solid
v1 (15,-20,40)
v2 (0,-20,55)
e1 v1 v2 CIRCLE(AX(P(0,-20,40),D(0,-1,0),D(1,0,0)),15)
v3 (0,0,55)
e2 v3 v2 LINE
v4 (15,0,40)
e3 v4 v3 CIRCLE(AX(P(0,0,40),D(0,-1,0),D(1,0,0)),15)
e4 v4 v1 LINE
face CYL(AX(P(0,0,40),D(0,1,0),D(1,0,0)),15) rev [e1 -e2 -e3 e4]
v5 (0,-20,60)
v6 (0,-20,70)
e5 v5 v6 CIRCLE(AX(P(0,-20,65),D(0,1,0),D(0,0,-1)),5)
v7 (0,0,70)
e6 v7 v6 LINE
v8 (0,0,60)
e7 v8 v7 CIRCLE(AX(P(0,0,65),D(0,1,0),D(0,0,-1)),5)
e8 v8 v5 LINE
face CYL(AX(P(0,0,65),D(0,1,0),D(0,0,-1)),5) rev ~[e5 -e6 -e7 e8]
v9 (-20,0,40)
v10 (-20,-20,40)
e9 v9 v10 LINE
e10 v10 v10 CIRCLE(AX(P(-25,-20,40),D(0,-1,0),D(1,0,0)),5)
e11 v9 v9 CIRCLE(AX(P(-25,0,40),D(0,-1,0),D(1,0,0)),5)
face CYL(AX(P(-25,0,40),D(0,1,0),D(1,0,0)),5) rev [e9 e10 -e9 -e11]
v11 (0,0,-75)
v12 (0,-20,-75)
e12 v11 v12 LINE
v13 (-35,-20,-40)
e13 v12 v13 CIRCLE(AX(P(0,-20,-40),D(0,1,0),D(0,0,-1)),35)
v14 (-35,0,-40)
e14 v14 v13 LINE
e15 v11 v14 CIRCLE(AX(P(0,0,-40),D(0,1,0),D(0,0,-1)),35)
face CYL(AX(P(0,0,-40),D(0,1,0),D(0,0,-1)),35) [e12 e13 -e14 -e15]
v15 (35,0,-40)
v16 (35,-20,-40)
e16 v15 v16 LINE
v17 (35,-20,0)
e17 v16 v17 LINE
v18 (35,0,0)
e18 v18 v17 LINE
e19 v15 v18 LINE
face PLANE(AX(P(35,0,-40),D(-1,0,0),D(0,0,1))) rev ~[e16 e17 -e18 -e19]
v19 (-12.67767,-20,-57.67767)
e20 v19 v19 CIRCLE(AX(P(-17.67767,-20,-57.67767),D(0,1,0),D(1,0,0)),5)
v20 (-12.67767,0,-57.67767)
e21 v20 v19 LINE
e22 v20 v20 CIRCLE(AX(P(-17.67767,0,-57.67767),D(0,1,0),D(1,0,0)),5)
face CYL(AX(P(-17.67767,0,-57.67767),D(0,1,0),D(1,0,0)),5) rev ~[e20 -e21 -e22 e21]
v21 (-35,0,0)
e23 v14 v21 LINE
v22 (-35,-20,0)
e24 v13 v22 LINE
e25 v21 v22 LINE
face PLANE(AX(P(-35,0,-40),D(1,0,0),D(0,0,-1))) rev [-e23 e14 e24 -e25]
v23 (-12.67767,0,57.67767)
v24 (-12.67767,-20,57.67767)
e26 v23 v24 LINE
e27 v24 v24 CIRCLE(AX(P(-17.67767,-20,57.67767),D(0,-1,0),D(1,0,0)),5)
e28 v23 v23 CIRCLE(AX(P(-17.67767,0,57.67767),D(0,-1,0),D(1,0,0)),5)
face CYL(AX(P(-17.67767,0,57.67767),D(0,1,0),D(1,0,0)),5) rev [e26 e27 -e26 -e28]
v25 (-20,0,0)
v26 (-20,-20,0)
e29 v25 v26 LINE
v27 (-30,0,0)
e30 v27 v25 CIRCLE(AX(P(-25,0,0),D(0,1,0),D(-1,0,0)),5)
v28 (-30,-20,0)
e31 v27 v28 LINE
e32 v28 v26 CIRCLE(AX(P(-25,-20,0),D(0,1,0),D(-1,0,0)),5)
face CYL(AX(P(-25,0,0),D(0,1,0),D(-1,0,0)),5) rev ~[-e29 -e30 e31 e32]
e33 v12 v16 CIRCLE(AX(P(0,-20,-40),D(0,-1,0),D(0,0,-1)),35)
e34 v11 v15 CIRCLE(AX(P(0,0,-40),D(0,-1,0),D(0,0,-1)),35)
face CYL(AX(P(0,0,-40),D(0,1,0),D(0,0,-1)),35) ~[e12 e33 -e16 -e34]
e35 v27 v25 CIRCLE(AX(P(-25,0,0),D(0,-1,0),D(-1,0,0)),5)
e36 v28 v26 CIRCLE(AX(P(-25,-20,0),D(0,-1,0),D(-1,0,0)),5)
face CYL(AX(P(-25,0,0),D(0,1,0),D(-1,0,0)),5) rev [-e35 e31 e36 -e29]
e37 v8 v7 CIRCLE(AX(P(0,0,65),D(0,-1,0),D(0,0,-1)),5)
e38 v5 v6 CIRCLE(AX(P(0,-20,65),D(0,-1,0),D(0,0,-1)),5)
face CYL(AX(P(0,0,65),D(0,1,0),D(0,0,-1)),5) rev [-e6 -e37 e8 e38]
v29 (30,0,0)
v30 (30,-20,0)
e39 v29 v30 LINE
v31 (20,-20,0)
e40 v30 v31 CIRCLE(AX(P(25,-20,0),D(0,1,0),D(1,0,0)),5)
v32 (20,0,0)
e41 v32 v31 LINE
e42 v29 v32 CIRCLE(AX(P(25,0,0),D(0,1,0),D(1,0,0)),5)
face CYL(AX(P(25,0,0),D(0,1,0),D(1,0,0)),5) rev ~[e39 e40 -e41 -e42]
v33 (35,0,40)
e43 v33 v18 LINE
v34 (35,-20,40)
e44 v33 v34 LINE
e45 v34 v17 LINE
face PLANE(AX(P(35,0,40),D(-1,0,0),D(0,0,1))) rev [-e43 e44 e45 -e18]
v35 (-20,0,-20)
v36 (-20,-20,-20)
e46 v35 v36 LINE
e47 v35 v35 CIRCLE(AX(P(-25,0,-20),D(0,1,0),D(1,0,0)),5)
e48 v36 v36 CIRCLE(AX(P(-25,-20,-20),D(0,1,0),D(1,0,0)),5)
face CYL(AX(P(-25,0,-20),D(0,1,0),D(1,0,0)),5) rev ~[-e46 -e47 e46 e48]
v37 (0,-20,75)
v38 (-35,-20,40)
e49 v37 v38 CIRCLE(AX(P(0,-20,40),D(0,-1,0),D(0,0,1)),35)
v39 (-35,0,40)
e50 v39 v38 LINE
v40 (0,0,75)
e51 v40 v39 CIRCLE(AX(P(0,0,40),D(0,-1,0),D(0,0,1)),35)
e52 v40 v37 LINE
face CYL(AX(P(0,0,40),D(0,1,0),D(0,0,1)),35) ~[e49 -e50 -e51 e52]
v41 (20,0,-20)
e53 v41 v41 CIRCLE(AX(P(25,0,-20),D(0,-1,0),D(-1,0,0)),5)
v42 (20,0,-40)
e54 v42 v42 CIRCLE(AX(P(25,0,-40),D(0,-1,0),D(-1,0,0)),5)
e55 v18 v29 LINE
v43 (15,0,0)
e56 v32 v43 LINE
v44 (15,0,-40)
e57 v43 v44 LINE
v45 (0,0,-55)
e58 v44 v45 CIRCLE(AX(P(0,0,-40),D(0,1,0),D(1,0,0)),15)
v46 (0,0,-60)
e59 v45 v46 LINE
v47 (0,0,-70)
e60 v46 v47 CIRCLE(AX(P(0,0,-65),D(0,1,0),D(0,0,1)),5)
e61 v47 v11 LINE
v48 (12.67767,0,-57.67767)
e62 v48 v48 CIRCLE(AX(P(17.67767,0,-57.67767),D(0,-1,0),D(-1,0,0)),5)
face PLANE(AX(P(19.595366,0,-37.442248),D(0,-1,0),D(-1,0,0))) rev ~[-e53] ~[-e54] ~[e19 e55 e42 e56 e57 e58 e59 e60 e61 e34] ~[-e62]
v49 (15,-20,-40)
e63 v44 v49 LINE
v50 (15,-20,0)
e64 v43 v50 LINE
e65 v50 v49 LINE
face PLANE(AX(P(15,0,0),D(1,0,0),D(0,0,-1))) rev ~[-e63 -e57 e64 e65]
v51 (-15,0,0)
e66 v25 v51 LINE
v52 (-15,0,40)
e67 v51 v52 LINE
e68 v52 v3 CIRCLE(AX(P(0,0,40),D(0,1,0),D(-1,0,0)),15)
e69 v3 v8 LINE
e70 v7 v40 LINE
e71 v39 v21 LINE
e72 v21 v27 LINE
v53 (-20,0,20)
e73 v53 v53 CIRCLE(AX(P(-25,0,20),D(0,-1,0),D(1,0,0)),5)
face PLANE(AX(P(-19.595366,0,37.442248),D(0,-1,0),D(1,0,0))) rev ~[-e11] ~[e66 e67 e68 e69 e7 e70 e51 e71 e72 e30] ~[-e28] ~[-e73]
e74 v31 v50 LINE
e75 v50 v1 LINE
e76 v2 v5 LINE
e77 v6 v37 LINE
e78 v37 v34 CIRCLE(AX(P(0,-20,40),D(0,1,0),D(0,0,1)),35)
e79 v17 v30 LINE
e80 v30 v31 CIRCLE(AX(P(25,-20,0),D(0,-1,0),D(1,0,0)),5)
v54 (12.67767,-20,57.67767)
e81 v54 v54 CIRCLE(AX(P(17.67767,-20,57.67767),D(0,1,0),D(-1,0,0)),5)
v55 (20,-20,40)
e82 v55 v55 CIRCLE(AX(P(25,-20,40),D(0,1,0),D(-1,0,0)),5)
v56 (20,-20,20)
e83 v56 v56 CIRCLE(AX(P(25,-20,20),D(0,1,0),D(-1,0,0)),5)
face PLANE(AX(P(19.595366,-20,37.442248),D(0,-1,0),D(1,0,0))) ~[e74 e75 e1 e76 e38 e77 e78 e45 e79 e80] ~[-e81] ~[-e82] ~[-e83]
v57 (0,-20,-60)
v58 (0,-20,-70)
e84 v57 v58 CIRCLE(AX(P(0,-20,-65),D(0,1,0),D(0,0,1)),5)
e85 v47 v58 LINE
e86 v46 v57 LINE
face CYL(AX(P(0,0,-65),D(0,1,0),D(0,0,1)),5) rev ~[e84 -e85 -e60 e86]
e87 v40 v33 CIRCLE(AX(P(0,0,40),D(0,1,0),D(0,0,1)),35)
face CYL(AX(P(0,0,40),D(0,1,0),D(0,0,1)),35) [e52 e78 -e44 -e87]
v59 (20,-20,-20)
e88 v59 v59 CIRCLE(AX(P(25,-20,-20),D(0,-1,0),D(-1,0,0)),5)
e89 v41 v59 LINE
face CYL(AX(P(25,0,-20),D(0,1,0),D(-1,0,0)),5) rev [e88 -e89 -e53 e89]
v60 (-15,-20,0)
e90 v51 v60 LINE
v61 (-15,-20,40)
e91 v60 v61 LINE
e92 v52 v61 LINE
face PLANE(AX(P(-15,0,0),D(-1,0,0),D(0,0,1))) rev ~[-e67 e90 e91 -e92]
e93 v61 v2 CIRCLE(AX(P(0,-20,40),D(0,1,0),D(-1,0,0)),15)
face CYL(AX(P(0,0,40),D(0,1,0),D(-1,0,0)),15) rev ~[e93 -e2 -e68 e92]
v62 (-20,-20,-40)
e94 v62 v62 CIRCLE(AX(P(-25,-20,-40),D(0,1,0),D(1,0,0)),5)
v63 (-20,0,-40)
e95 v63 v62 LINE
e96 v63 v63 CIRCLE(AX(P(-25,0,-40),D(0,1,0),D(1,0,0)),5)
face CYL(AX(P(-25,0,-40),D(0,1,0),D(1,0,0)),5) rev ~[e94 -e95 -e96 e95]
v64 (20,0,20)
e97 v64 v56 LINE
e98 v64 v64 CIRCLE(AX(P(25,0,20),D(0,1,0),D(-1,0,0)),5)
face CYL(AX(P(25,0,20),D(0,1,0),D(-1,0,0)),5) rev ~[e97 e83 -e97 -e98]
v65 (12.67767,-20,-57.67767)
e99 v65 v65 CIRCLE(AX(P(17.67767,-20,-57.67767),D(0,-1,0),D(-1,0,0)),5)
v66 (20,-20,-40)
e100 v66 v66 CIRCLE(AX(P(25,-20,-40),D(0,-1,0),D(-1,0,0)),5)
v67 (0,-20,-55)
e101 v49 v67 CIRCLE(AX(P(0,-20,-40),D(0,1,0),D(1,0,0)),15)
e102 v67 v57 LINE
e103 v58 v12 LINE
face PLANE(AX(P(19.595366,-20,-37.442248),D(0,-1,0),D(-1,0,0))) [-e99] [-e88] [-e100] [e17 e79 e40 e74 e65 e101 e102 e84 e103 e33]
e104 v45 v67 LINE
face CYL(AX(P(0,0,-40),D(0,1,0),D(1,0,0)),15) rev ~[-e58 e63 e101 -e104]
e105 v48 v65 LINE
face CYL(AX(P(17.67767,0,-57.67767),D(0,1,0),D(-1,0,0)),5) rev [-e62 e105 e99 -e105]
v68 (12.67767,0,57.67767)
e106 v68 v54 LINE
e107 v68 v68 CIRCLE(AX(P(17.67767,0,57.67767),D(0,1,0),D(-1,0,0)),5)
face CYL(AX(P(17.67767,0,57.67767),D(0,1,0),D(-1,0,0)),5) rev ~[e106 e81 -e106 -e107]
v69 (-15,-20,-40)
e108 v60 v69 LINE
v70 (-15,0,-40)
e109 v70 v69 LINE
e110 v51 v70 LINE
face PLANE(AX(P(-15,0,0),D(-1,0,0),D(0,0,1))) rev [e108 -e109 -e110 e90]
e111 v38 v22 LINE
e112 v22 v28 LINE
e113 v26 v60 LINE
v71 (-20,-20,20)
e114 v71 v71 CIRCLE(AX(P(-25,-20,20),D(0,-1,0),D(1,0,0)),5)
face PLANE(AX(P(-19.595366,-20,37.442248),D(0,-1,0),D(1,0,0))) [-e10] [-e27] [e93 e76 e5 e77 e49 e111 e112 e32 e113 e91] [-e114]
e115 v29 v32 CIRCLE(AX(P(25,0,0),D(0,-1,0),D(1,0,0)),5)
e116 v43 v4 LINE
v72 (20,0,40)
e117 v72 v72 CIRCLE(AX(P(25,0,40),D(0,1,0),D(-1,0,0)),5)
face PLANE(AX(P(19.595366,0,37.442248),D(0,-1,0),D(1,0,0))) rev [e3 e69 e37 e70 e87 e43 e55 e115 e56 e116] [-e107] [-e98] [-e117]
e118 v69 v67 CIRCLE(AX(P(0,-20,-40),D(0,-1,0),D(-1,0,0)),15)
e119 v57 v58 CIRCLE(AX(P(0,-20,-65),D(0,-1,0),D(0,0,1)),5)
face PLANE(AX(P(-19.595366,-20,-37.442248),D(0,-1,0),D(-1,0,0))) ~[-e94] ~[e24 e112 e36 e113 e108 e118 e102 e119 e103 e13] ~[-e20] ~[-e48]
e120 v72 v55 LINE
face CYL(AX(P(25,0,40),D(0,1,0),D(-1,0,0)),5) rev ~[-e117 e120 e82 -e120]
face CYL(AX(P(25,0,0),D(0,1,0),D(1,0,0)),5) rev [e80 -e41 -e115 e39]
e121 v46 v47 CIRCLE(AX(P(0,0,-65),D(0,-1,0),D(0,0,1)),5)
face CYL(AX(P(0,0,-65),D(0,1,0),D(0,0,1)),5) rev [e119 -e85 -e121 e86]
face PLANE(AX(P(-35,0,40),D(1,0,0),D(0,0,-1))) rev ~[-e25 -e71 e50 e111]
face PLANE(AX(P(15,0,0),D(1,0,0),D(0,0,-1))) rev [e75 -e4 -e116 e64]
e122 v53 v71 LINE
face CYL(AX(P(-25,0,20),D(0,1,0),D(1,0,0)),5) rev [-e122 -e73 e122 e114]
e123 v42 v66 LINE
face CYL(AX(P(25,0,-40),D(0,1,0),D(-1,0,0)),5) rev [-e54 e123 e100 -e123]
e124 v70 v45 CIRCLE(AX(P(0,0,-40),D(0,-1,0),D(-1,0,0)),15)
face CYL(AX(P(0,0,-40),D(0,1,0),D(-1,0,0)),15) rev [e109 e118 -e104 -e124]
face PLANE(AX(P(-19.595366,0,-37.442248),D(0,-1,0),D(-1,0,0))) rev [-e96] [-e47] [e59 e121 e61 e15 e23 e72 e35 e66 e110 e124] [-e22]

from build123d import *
from build123d import SkipClean  # not in build123d's __all__

# Parameters (mm, degrees)
F0_R     = 5
F1_DEPTH = 20


with BuildPart() as f1:
    # F0 (on Front) → F1 (new body)
    with BuildSketch(Plane.XZ):
        with BuildLine():
            ThreePointArc((-15, 40), (-10.6066017178, 50.6066017178), (0, 55))
            Line((0, 55), (0, 60))
            ThreePointArc((0, 60), (-5, 65), (0, 70))
            Line((0, 70), (0, 75))
            ThreePointArc((0, 75), (-24.7487373415, 64.7487373415), (-35, 40))
            Line((-35, 40), (-35, 0))
            Line((-35, 0), (-30, 0))
            ThreePointArc((-30, 0), (-25, 5), (-20, 0))
            Line((-20, 0), (-15, 0))
            Line((-15, 0), (-15, 40))
        make_face()
        with Locations((-25, 20)):
            Circle(F0_R, mode=Mode.SUBTRACT)
        with Locations((-25, 40)):
            Circle(F0_R, mode=Mode.SUBTRACT)
        with Locations((-17.6776695297, 57.6776695297)):
            Circle(F0_R, mode=Mode.SUBTRACT)
    extrude(amount=F1_DEPTH)

    # F2: F1 across plane


with BuildPart() as f1_1:
    add(f1.part, clean=False)
    with SkipClean():  # cleaning this boolean's faces spoils the solid; the shape is the same uncleaned
        add(f1.part.mirror(Plane.YZ), clean=False)

    # F3: F1 across plane


with BuildPart() as f1_2:
    add(f1_1.part, clean=False)
    with SkipClean():  # cleaning this boolean's faces spoils the solid; the shape is the same uncleaned
        add(f1_1.part.mirror(Plane.XY), clean=False)


solid = f1_2.part
